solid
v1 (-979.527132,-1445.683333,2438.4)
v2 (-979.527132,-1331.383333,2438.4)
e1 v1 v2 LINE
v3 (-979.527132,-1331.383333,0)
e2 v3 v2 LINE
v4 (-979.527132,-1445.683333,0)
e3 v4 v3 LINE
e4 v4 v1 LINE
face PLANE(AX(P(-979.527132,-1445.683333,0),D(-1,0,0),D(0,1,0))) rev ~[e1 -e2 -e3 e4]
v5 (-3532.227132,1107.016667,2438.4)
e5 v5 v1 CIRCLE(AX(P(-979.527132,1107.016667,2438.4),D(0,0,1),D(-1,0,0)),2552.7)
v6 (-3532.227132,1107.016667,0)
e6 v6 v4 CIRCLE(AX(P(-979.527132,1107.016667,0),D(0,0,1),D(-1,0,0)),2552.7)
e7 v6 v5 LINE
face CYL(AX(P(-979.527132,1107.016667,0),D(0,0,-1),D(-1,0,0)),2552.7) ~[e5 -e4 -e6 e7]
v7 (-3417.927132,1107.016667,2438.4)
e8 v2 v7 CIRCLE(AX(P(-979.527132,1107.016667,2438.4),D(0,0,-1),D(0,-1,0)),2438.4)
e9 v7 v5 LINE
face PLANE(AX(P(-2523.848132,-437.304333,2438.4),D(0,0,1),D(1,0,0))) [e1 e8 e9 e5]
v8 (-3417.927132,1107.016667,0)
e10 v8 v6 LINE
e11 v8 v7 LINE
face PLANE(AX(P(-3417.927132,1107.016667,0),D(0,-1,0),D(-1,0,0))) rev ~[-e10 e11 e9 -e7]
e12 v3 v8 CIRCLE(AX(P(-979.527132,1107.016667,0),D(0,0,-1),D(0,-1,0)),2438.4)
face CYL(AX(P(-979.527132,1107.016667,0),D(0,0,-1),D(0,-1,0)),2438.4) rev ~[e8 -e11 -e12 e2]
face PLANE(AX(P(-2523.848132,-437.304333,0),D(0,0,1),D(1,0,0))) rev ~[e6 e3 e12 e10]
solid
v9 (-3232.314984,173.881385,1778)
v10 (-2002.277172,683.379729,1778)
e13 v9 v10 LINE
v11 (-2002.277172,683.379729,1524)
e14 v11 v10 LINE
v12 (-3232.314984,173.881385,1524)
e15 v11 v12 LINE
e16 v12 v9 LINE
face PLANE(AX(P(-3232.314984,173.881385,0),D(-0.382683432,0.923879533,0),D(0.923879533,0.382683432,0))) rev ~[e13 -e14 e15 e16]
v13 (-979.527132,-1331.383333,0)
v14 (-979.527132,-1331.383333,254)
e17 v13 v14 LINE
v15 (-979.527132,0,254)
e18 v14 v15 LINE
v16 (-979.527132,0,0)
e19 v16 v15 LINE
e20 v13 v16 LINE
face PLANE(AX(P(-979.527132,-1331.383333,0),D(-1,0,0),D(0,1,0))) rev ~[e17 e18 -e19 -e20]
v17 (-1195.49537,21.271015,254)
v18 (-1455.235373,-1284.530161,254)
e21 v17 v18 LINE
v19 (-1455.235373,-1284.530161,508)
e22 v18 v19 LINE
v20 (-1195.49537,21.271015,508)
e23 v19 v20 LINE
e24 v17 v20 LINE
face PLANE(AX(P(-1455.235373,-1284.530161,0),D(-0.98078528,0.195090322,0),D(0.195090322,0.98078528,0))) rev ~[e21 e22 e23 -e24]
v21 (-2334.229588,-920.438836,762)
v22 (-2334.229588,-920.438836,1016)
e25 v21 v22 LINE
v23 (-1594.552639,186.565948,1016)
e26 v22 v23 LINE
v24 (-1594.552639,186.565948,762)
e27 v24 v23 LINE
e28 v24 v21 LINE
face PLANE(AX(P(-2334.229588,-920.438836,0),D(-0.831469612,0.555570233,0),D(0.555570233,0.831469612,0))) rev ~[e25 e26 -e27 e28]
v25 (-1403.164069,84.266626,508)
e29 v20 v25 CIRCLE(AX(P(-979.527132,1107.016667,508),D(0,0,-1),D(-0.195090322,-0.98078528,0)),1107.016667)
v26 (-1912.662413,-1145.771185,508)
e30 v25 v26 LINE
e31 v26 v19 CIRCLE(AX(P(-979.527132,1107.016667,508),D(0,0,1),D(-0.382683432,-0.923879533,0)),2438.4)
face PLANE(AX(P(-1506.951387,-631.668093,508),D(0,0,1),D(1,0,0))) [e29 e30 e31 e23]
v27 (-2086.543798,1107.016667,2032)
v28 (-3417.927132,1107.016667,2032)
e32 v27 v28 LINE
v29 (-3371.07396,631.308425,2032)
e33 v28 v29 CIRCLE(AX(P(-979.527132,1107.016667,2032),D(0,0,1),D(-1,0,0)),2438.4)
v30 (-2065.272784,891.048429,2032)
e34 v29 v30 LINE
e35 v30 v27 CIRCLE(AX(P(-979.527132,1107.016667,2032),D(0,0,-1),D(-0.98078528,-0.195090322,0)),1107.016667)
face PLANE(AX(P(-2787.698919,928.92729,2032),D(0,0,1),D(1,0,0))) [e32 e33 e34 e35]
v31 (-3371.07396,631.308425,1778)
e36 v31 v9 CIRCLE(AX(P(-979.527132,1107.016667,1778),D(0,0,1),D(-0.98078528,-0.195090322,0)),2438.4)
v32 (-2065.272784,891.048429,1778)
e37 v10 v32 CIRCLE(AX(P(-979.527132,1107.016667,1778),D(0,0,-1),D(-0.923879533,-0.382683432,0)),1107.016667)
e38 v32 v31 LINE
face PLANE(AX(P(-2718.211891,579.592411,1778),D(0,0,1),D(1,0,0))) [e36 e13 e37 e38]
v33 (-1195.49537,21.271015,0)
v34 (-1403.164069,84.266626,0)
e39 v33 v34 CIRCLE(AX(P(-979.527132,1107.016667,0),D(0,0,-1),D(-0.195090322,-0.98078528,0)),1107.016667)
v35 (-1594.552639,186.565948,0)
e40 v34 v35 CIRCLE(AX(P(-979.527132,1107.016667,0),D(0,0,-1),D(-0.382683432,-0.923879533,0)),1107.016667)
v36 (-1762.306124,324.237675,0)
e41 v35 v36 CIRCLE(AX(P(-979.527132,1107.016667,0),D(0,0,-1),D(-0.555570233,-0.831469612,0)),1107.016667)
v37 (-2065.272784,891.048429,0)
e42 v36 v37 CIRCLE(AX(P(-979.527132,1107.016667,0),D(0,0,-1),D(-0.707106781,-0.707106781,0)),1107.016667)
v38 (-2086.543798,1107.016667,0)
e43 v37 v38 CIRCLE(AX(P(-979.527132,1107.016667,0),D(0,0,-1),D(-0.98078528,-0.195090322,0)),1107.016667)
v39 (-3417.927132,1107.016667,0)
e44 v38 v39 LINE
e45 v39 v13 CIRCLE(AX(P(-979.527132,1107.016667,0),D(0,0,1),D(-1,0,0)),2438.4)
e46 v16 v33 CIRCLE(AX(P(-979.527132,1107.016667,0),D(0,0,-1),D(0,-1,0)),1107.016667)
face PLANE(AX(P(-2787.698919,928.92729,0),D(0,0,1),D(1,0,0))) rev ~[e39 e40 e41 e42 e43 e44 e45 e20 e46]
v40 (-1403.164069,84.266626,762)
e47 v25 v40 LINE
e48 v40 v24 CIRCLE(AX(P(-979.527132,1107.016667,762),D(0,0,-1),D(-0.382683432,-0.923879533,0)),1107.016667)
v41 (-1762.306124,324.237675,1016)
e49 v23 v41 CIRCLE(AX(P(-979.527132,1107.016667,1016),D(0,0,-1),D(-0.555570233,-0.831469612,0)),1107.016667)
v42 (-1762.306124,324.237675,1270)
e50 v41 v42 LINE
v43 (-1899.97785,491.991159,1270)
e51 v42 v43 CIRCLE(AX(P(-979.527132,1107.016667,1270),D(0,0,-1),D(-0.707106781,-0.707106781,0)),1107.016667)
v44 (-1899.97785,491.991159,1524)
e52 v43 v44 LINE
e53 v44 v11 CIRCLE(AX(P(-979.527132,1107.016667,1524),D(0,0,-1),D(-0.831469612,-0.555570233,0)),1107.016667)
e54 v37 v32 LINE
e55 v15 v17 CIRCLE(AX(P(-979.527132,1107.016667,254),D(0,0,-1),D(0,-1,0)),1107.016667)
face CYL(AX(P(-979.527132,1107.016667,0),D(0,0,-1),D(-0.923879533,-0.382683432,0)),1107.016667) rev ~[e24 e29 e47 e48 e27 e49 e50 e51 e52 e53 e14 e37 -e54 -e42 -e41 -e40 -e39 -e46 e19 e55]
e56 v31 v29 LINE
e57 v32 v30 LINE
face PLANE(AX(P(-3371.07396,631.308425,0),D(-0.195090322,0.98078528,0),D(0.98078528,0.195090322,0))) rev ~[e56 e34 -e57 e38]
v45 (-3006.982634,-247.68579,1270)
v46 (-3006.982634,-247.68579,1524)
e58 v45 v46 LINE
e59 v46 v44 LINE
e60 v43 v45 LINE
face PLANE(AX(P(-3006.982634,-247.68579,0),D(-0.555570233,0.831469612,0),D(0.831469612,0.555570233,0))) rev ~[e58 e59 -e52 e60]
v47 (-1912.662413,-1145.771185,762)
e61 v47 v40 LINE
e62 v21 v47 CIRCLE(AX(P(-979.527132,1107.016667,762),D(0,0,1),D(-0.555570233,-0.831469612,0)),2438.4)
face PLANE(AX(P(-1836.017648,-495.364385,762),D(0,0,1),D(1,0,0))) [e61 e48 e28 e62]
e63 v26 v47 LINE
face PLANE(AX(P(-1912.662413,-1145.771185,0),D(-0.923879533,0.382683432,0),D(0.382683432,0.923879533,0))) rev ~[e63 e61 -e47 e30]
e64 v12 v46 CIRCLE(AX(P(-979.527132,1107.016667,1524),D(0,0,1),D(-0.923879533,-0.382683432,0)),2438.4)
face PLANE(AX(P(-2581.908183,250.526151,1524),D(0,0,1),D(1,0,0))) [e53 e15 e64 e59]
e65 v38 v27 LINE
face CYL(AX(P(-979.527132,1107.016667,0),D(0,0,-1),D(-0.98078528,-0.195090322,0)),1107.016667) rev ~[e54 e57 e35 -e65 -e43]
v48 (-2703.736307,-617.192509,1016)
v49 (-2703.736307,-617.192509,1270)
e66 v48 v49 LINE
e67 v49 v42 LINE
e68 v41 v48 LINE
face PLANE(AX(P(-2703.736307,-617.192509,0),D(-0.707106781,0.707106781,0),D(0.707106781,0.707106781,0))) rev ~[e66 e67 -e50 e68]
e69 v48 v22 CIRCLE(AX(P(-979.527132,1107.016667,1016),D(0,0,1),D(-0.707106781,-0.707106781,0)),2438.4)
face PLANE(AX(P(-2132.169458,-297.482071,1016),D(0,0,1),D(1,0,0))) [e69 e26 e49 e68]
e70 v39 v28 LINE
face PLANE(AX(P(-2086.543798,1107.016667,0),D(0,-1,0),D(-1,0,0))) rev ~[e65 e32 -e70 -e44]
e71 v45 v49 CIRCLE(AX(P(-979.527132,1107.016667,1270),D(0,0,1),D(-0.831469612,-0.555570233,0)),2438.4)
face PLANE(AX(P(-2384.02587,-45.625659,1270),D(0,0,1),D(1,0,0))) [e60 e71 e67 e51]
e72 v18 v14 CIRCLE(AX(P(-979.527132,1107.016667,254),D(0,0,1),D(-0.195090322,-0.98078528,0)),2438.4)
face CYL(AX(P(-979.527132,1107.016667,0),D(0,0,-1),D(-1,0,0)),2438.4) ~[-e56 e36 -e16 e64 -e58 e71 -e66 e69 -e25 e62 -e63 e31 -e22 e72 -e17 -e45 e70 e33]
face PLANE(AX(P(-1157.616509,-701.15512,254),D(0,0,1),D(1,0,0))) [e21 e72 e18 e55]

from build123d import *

# Parameters (mm, degrees)
F10_DEPTH = 254
F11_DEPTH = 508
F12_DEPTH = 762
F13_DEPTH = 1016
F14_DEPTH = 1270
F15_DEPTH = 1524
F16_DEPTH = 1778
F17_DEPTH = 2032
F19_DEPTH = 2438.4


# Not quite as in the source:
# - a variable given as a bare number and used for a length is read in inches; the dataset says mm whatever the document's units were


with BuildPart() as f10:
    # F2 (on Top) → F10 (new body)
    with BuildSketch(Plane.XY):
        with BuildLine():
            Line((-979.52713178, -1331.3833333333), (-979.52713178, 0))
            ThreePointArc((-979.52713178, 0), (-1088.0337397438, 5.3305878284), (-1195.4953697572, 21.271014839))
            Line((-1195.4953697572, 21.271014839), (-1455.2353729841, -1284.5301610686))
            ThreePointArc((-1455.2353729841, -1284.5301610686), (-1218.5321267596, -1319.6417708508), (-979.52713178, -1331.3833333333))
        make_face()
    extrude(amount=F10_DEPTH)

    # F3 (on Top) → F11 (join)
    with BuildSketch(Plane.XY):
        with BuildLine():
            Line((-1455.2353729841, -1284.5301610686), (-1195.4953697572, 21.271014839))
            ThreePointArc((-1195.4953697572, 21.271014839), (-1300.8771075786, 47.6677660055), (-1403.1640694653, 84.2666261845))
            Line((-1403.1640694653, 84.2666261845), (-1912.662413259, -1145.7711854089))
            ThreePointArc((-1912.662413259, -1145.7711854089), (-1687.3572887973, -1226.3866479828), (-1455.2353729841, -1284.5301610686))
        make_face()
    extrude(amount=F11_DEPTH)

    # F4 (on Top) → F12 (join)
    with BuildSketch(Plane.XY):
        with BuildLine():
            Line((-1912.662413259, -1145.7711854089), (-1403.1640694653, 84.2666261845))
            ThreePointArc((-1403.1640694653, 84.2666261845), (-1501.3711760586, 130.7151283453), (-1594.5526392366, 186.5659480209))
            Line((-1594.5526392366, 186.5659480209), (-2334.229587975, -920.4388359719))
            ThreePointArc((-2334.229587975, -920.4388359719), (-2128.9809348565, -1043.4601443204), (-1912.662413259, -1145.7711854089))
        make_face()
    extrude(amount=F12_DEPTH)

    # F5 (on Top) → F13 (join)
    with BuildSketch(Plane.XY):
        with BuildLine():
            Line((-2334.229587975, -920.4388359719), (-1594.5526392366, 186.5659480209))
            ThreePointArc((-1594.5526392366, 186.5659480209), (-1681.8110705705, 251.2812112866), (-1762.3061236665, 324.2376747801))
            Line((-1762.3061236665, 324.2376747801), (-2703.7363070253, -617.1925085786))
            ThreePointArc((-2703.7363070253, -617.1925085786), (-2526.4317158846, -777.892022813), (-2334.229587975, -920.4388359719))
        make_face()
    extrude(amount=F13_DEPTH)

    # F6 (on Top) → F14 (join)
    with BuildSketch(Plane.XY):
        with BuildLine():
            Line((-2703.7363070253, -617.1925085786), (-1762.3061236665, 324.2376747801))
            ThreePointArc((-1762.3061236665, 324.2376747801), (-1835.2625871601, 404.7327278761), (-1899.9778504258, 491.9911592101))
            Line((-1899.9778504258, 491.9911592101), (-3006.9826344185, -247.6857895283))
            ThreePointArc((-3006.9826344185, -247.6857895283), (-2864.4358212597, -439.887917438), (-2703.7363070253, -617.1925085786))
        make_face()
    extrude(amount=F14_DEPTH)

    # F7 (on Top) → F15 (join)
    with BuildSketch(Plane.XY):
        with BuildLine():
            Line((-3006.9826344185, -247.6857895283), (-1899.9778504258, 491.9911592101))
            ThreePointArc((-1899.9778504258, 491.9911592101), (-1955.8286701014, 585.172622388), (-2002.2771722622, 683.3797289813))
            Line((-2002.2771722622, 683.3797289813), (-3232.3149838555, 173.8813851876))
            ThreePointArc((-3232.3149838555, 173.8813851876), (-3130.003942767, -42.4371364098), (-3006.9826344185, -247.6857895283))
        make_face()
    extrude(amount=F15_DEPTH)

    # F8 (on Top) → F16 (join)
    with BuildSketch(Plane.XY):
        with BuildLine():
            Line((-3232.3149838555, 173.8813851876), (-2002.2771722622, 683.3797289813))
            ThreePointArc((-2002.2771722622, 683.3797289813), (-2038.8760324411, 785.666690868), (-2065.2727836077, 891.0484286894))
            Line((-2065.2727836077, 891.0484286894), (-3371.0739595152, 631.3084254625))
            ThreePointArc((-3371.0739595152, 631.3084254625), (-3312.9304464294, 399.1865096494), (-3232.3149838555, 173.8813851876))
        make_face()
    extrude(amount=F16_DEPTH)

    # F9 (on Top) → F17 (join)
    with BuildSketch(Plane.XY):
        with BuildLine():
            Line((-3371.0739595152, 631.3084254625), (-2065.2727836077, 891.0484286894))
            ThreePointArc((-2065.2727836077, 891.0484286894), (-2081.2132106182, 998.5100587028), (-2086.5437984467, 1107.0166666667))
            Line((-2086.5437984467, 1107.0166666667), (-3417.92713178, 1107.0166666667))
            ThreePointArc((-3417.92713178, 1107.0166666667), (-3406.1855692975, 868.0116716871), (-3371.0739595152, 631.3084254625))
        make_face()
    extrude(amount=F17_DEPTH)


with BuildPart() as f19:
    # F18 (on Top) → F19 (new body)
    with BuildSketch(Plane.XY):
        with BuildLine():
            ThreePointArc((-979.52713178, -1331.3833333333), (-2703.7363070253, -617.1925085786), (-3417.92713178, 1107.0166666667))
            Line((-3417.92713178, 1107.0166666667), (-3532.22713178, 1107.0166666667))
            ThreePointArc((-3532.22713178, 1107.0166666667), (-2784.5586121149, -698.0148136682), (-979.52713178, -1445.6833333333))
            Line((-979.52713178, -1445.6833333333), (-979.52713178, -1331.3833333333))
        make_face()
    extrude(amount=F19_DEPTH)


solid = Compound([f10.part, f19.part])
